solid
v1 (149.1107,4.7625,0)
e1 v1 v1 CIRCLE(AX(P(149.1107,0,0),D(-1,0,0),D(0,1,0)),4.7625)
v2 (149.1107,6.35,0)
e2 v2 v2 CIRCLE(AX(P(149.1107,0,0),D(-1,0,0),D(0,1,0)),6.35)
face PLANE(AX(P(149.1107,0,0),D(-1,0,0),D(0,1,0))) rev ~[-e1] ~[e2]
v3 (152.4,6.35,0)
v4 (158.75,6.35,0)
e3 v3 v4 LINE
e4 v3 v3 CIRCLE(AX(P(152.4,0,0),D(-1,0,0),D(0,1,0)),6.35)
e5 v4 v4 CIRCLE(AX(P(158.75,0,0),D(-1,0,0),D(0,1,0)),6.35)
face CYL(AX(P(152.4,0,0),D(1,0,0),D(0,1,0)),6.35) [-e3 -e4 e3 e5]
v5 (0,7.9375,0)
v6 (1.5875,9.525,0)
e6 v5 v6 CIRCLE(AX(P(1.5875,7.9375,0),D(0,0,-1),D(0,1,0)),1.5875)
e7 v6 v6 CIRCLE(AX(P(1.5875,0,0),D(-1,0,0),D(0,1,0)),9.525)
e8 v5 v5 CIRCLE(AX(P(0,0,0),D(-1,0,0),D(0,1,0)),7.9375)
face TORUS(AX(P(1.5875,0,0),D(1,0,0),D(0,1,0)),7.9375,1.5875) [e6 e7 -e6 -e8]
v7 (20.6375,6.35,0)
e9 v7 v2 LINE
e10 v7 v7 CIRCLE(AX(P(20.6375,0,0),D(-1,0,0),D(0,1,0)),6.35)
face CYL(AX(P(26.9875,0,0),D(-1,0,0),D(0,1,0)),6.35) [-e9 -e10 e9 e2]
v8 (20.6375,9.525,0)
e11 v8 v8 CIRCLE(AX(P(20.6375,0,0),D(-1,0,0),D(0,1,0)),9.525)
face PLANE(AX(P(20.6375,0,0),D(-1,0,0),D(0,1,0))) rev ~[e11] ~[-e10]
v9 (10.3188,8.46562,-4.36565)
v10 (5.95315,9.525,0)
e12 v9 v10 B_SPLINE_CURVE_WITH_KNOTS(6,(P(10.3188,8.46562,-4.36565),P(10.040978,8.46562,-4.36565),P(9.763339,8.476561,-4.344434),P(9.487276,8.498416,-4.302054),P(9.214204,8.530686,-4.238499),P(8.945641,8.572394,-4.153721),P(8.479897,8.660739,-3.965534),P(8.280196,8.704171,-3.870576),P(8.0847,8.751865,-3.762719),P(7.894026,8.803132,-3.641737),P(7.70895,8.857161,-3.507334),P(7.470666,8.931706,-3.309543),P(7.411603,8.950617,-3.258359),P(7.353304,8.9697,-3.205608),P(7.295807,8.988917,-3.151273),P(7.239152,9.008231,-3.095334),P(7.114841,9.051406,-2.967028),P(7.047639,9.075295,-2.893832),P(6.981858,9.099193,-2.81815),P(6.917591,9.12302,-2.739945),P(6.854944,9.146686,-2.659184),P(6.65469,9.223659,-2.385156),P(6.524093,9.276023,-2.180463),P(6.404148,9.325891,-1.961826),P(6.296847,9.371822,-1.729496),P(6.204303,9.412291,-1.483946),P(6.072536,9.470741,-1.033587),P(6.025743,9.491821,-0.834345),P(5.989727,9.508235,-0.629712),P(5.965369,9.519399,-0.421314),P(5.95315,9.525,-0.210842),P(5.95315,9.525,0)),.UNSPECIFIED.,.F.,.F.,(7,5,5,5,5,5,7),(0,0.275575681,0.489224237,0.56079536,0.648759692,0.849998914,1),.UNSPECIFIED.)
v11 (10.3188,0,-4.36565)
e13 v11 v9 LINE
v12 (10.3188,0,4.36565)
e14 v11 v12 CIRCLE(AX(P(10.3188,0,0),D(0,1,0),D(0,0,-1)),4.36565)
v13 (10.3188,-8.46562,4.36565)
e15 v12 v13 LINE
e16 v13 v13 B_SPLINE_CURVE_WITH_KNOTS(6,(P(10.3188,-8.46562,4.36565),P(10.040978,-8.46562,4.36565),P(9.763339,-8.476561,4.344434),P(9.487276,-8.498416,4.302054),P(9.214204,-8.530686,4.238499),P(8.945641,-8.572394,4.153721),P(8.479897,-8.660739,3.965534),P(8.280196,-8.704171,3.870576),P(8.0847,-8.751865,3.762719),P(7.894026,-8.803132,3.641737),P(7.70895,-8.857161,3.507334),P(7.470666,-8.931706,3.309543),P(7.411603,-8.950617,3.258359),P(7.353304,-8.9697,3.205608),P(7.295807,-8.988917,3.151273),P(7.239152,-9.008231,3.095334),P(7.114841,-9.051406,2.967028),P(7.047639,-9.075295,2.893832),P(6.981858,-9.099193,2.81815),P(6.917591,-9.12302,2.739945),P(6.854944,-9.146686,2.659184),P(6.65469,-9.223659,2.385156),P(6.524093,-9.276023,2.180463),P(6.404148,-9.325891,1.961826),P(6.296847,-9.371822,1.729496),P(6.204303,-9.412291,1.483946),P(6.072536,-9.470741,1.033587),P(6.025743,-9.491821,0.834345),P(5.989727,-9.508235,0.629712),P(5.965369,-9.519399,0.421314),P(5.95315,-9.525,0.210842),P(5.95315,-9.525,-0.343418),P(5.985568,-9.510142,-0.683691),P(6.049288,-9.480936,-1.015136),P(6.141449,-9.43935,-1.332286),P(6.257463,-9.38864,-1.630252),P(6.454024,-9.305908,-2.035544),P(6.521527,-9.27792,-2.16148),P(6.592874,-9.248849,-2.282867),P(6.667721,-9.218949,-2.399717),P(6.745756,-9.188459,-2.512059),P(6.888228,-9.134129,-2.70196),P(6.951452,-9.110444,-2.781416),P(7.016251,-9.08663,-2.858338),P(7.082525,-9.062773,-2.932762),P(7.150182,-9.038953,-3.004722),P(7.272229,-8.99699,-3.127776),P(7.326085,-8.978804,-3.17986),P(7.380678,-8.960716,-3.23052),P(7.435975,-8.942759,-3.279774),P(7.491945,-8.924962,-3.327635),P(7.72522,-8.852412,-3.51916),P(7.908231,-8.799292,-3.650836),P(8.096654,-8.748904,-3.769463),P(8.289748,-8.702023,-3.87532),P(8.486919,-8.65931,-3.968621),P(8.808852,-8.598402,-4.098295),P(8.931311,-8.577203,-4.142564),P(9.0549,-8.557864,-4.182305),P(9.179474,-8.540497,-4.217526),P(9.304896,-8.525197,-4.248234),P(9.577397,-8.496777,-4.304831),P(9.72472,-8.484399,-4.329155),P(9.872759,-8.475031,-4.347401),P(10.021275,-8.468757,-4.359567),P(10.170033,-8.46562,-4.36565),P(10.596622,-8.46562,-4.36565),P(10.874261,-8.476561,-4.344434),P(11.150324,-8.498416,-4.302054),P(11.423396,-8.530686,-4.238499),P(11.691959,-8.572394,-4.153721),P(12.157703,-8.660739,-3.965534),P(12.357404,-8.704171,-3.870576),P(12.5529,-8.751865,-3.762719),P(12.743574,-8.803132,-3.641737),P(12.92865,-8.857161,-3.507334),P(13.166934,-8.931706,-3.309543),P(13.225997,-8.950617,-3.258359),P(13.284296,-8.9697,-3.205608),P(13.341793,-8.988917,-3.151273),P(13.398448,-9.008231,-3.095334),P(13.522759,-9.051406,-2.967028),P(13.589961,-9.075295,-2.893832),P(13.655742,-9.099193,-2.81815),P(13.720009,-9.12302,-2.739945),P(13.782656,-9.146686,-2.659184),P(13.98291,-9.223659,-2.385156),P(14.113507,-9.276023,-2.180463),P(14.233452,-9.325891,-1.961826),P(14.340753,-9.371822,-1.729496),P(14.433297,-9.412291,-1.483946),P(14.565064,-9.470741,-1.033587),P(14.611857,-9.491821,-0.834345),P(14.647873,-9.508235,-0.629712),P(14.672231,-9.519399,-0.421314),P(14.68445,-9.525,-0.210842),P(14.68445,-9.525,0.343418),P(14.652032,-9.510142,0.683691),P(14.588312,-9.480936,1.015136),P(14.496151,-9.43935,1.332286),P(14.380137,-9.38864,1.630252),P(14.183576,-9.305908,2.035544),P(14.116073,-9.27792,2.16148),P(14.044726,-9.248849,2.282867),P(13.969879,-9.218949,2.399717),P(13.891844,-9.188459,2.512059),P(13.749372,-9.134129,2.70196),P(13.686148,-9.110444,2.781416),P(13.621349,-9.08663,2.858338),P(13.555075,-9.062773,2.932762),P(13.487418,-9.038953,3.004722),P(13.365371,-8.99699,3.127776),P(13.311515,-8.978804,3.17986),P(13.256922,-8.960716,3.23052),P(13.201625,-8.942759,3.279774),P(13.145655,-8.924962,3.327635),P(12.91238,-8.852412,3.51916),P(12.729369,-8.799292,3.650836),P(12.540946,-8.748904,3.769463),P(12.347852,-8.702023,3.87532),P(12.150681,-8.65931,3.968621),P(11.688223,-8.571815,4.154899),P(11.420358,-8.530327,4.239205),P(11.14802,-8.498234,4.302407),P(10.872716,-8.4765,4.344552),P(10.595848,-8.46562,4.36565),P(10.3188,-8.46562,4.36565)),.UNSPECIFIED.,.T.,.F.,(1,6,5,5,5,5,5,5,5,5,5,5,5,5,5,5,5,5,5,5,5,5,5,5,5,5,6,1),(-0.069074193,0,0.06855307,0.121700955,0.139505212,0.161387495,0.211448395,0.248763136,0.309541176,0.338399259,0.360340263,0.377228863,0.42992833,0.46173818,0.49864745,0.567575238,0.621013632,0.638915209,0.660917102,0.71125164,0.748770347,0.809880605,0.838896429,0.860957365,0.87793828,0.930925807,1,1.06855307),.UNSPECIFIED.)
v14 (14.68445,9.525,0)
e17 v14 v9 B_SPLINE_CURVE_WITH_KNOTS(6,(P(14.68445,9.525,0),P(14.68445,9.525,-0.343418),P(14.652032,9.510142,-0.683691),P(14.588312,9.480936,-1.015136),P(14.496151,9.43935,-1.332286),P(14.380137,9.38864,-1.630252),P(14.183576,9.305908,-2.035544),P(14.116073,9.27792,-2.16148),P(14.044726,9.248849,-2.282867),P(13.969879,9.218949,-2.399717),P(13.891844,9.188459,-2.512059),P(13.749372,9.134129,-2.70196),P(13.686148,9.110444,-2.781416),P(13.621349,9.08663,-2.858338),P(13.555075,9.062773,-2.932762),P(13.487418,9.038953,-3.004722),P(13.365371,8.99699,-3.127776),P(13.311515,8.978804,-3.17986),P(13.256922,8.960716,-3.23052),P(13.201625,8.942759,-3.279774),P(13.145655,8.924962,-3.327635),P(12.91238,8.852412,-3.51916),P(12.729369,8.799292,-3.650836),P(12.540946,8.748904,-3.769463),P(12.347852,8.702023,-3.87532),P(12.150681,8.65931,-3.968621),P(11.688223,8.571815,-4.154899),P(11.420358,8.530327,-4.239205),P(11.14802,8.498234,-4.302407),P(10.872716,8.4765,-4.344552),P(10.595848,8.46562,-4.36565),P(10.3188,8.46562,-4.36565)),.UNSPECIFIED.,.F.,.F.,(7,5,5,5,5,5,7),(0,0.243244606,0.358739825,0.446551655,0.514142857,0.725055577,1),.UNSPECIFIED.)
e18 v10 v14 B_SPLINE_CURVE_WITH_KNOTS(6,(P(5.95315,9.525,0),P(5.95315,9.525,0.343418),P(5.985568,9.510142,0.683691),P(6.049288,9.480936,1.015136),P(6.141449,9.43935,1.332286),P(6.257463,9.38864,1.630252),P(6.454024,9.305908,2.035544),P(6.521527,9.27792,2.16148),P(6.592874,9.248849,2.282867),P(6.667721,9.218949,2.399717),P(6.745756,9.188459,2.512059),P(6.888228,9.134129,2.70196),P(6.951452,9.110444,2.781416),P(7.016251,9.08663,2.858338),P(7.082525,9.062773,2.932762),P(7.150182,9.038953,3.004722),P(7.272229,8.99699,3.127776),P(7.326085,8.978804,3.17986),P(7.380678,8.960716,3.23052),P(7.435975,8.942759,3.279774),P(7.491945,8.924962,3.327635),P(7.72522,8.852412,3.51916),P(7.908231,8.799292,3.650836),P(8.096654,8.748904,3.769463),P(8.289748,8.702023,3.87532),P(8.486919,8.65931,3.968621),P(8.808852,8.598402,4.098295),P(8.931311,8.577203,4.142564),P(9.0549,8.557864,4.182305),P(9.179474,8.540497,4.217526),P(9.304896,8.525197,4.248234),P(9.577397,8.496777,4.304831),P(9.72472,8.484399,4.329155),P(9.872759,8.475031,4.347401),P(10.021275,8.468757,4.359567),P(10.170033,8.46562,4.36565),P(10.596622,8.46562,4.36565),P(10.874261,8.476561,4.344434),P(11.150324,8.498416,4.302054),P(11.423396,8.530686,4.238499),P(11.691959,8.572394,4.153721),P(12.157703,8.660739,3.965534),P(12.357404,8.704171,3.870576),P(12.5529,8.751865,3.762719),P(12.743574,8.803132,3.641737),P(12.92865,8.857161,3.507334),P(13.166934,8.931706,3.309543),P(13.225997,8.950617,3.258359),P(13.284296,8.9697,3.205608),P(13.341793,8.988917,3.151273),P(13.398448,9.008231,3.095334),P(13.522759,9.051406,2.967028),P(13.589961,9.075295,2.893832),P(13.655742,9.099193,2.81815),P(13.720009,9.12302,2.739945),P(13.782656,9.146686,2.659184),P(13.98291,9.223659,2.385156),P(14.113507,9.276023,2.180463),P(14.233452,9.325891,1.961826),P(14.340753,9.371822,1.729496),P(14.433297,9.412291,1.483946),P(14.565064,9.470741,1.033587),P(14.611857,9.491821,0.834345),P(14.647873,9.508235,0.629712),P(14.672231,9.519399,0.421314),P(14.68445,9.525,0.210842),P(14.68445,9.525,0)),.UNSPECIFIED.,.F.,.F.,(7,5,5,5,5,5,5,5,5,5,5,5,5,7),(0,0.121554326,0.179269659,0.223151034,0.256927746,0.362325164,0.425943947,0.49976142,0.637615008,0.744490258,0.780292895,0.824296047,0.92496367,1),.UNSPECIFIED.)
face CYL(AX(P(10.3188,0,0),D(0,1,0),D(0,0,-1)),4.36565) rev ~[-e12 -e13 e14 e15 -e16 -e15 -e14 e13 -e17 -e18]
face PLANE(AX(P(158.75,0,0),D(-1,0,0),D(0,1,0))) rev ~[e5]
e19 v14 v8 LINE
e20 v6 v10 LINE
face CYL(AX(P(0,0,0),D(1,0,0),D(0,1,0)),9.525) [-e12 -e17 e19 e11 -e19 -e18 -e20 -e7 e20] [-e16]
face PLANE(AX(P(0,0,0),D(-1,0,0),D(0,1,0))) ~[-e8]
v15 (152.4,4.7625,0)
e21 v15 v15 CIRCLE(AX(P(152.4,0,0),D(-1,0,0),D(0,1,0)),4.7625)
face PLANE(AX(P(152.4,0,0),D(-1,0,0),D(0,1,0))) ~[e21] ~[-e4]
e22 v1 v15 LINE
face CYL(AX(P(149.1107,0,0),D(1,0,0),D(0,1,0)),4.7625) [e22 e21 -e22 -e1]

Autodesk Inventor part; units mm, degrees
ref_plane "YZ Plane" through (0, 0, 0) normal (1, 0, 0) x (0, 1, 0)
ref_plane "XZ Plane" through (0, 0, 0) normal (0, 1, 0) x (-1, 0, 0)
ref_plane "XY Plane" through (0, 0, 0) normal (0, 0, 1) x (1, 0, 0)
sketch "Sketch1" plane through (0, 0, 0) normal (0, 0, 1) x (1, 0, 0)
  line L0 (0, 0) -> (0, 9.525)
  line L1 (0, 9.525) -> (20.6375, 9.525)
  line L2 (20.6375, 9.525) -> (20.6375, 6.35)
  line L3 (149.1107, 6.35) -> (149.1107, 4.7625)
  line L4 (149.1107, 4.7625) -> (152.4, 4.7625)
  line L5 (152.4, 4.7625) -> (152.4, 6.35)
  line L6 (152.4, 6.35) -> (158.75, 6.35)
  line L7 (158.75, 6.35) -> (158.75, 0)
  line L8 (158.75, 0) -> (0, 0)
  line L9 (149.1107, 6.35) -> (127, 6.35)
  line L10 (127, 6.35) -> (26.9875, 6.35)
  line L11 (26.9875, 6.35) -> (20.6375, 6.35)
  dimension "d0" = 9.525
  dimension "d1" = 20.6375
  dimension "d2" = 158.75
  dimension "d4" = 6.35
  dimension "d7" = 4.7625
  dimension "d8" = 3.2893
  dimension "d10" = 6.35
  dimension "d11" = 100.0125
  dimension "d12" = 6.35
revolve "Revolution1" add sketch "Sketch1" angle 360 about axis through (158.75, 0, 0) along (-1, 0, 0)
thread "Thread1" size "5/8-8 Acme" class "2G" standard "Acme Threads" length 100.0125 offset 22.1107
sketch "Sketch2" plane through (0, 0, 0) normal (0, 1, 0) x (-1, 0, 0)
  circle A0 centre (-10.3188, 0) radius 4.3656
  line L0 (0, 9.525) -> (0, -9.525) projected
  point P0 (0, 0)
  dimension "d15" = 8.7312
  dimension "d27" = 10.3187
  dimension "d28" = 9.525
hole "Hole1" at (10.3188, 0, 0) direction (0, 1, 0) diameter 8.7313 end through all
sketch "Sketch3" plane through (0, 0, 0) normal (0, 1, 0) x (-1, 0, 0)
  circle A0 centre (-10.3188, 0) radius 4.3656
  line L0 (0, 9.525) -> (0, -9.525) projected
  point P0 (0, 0)
  dimension "d23" = 10.3187
  dimension "d24" = 8.7312
  dimension "d26" = 9.525
hole "Hole2" at (10.3188, 0, 0) direction (0, -1, 0) diameter 8.7313 end through all
fillet "Fillet1" radius 1.5875 1 edges at (0, -9.525, 0)
properties part number "VS-004 (VISE SCREW)" material "Steel, Alloy"
